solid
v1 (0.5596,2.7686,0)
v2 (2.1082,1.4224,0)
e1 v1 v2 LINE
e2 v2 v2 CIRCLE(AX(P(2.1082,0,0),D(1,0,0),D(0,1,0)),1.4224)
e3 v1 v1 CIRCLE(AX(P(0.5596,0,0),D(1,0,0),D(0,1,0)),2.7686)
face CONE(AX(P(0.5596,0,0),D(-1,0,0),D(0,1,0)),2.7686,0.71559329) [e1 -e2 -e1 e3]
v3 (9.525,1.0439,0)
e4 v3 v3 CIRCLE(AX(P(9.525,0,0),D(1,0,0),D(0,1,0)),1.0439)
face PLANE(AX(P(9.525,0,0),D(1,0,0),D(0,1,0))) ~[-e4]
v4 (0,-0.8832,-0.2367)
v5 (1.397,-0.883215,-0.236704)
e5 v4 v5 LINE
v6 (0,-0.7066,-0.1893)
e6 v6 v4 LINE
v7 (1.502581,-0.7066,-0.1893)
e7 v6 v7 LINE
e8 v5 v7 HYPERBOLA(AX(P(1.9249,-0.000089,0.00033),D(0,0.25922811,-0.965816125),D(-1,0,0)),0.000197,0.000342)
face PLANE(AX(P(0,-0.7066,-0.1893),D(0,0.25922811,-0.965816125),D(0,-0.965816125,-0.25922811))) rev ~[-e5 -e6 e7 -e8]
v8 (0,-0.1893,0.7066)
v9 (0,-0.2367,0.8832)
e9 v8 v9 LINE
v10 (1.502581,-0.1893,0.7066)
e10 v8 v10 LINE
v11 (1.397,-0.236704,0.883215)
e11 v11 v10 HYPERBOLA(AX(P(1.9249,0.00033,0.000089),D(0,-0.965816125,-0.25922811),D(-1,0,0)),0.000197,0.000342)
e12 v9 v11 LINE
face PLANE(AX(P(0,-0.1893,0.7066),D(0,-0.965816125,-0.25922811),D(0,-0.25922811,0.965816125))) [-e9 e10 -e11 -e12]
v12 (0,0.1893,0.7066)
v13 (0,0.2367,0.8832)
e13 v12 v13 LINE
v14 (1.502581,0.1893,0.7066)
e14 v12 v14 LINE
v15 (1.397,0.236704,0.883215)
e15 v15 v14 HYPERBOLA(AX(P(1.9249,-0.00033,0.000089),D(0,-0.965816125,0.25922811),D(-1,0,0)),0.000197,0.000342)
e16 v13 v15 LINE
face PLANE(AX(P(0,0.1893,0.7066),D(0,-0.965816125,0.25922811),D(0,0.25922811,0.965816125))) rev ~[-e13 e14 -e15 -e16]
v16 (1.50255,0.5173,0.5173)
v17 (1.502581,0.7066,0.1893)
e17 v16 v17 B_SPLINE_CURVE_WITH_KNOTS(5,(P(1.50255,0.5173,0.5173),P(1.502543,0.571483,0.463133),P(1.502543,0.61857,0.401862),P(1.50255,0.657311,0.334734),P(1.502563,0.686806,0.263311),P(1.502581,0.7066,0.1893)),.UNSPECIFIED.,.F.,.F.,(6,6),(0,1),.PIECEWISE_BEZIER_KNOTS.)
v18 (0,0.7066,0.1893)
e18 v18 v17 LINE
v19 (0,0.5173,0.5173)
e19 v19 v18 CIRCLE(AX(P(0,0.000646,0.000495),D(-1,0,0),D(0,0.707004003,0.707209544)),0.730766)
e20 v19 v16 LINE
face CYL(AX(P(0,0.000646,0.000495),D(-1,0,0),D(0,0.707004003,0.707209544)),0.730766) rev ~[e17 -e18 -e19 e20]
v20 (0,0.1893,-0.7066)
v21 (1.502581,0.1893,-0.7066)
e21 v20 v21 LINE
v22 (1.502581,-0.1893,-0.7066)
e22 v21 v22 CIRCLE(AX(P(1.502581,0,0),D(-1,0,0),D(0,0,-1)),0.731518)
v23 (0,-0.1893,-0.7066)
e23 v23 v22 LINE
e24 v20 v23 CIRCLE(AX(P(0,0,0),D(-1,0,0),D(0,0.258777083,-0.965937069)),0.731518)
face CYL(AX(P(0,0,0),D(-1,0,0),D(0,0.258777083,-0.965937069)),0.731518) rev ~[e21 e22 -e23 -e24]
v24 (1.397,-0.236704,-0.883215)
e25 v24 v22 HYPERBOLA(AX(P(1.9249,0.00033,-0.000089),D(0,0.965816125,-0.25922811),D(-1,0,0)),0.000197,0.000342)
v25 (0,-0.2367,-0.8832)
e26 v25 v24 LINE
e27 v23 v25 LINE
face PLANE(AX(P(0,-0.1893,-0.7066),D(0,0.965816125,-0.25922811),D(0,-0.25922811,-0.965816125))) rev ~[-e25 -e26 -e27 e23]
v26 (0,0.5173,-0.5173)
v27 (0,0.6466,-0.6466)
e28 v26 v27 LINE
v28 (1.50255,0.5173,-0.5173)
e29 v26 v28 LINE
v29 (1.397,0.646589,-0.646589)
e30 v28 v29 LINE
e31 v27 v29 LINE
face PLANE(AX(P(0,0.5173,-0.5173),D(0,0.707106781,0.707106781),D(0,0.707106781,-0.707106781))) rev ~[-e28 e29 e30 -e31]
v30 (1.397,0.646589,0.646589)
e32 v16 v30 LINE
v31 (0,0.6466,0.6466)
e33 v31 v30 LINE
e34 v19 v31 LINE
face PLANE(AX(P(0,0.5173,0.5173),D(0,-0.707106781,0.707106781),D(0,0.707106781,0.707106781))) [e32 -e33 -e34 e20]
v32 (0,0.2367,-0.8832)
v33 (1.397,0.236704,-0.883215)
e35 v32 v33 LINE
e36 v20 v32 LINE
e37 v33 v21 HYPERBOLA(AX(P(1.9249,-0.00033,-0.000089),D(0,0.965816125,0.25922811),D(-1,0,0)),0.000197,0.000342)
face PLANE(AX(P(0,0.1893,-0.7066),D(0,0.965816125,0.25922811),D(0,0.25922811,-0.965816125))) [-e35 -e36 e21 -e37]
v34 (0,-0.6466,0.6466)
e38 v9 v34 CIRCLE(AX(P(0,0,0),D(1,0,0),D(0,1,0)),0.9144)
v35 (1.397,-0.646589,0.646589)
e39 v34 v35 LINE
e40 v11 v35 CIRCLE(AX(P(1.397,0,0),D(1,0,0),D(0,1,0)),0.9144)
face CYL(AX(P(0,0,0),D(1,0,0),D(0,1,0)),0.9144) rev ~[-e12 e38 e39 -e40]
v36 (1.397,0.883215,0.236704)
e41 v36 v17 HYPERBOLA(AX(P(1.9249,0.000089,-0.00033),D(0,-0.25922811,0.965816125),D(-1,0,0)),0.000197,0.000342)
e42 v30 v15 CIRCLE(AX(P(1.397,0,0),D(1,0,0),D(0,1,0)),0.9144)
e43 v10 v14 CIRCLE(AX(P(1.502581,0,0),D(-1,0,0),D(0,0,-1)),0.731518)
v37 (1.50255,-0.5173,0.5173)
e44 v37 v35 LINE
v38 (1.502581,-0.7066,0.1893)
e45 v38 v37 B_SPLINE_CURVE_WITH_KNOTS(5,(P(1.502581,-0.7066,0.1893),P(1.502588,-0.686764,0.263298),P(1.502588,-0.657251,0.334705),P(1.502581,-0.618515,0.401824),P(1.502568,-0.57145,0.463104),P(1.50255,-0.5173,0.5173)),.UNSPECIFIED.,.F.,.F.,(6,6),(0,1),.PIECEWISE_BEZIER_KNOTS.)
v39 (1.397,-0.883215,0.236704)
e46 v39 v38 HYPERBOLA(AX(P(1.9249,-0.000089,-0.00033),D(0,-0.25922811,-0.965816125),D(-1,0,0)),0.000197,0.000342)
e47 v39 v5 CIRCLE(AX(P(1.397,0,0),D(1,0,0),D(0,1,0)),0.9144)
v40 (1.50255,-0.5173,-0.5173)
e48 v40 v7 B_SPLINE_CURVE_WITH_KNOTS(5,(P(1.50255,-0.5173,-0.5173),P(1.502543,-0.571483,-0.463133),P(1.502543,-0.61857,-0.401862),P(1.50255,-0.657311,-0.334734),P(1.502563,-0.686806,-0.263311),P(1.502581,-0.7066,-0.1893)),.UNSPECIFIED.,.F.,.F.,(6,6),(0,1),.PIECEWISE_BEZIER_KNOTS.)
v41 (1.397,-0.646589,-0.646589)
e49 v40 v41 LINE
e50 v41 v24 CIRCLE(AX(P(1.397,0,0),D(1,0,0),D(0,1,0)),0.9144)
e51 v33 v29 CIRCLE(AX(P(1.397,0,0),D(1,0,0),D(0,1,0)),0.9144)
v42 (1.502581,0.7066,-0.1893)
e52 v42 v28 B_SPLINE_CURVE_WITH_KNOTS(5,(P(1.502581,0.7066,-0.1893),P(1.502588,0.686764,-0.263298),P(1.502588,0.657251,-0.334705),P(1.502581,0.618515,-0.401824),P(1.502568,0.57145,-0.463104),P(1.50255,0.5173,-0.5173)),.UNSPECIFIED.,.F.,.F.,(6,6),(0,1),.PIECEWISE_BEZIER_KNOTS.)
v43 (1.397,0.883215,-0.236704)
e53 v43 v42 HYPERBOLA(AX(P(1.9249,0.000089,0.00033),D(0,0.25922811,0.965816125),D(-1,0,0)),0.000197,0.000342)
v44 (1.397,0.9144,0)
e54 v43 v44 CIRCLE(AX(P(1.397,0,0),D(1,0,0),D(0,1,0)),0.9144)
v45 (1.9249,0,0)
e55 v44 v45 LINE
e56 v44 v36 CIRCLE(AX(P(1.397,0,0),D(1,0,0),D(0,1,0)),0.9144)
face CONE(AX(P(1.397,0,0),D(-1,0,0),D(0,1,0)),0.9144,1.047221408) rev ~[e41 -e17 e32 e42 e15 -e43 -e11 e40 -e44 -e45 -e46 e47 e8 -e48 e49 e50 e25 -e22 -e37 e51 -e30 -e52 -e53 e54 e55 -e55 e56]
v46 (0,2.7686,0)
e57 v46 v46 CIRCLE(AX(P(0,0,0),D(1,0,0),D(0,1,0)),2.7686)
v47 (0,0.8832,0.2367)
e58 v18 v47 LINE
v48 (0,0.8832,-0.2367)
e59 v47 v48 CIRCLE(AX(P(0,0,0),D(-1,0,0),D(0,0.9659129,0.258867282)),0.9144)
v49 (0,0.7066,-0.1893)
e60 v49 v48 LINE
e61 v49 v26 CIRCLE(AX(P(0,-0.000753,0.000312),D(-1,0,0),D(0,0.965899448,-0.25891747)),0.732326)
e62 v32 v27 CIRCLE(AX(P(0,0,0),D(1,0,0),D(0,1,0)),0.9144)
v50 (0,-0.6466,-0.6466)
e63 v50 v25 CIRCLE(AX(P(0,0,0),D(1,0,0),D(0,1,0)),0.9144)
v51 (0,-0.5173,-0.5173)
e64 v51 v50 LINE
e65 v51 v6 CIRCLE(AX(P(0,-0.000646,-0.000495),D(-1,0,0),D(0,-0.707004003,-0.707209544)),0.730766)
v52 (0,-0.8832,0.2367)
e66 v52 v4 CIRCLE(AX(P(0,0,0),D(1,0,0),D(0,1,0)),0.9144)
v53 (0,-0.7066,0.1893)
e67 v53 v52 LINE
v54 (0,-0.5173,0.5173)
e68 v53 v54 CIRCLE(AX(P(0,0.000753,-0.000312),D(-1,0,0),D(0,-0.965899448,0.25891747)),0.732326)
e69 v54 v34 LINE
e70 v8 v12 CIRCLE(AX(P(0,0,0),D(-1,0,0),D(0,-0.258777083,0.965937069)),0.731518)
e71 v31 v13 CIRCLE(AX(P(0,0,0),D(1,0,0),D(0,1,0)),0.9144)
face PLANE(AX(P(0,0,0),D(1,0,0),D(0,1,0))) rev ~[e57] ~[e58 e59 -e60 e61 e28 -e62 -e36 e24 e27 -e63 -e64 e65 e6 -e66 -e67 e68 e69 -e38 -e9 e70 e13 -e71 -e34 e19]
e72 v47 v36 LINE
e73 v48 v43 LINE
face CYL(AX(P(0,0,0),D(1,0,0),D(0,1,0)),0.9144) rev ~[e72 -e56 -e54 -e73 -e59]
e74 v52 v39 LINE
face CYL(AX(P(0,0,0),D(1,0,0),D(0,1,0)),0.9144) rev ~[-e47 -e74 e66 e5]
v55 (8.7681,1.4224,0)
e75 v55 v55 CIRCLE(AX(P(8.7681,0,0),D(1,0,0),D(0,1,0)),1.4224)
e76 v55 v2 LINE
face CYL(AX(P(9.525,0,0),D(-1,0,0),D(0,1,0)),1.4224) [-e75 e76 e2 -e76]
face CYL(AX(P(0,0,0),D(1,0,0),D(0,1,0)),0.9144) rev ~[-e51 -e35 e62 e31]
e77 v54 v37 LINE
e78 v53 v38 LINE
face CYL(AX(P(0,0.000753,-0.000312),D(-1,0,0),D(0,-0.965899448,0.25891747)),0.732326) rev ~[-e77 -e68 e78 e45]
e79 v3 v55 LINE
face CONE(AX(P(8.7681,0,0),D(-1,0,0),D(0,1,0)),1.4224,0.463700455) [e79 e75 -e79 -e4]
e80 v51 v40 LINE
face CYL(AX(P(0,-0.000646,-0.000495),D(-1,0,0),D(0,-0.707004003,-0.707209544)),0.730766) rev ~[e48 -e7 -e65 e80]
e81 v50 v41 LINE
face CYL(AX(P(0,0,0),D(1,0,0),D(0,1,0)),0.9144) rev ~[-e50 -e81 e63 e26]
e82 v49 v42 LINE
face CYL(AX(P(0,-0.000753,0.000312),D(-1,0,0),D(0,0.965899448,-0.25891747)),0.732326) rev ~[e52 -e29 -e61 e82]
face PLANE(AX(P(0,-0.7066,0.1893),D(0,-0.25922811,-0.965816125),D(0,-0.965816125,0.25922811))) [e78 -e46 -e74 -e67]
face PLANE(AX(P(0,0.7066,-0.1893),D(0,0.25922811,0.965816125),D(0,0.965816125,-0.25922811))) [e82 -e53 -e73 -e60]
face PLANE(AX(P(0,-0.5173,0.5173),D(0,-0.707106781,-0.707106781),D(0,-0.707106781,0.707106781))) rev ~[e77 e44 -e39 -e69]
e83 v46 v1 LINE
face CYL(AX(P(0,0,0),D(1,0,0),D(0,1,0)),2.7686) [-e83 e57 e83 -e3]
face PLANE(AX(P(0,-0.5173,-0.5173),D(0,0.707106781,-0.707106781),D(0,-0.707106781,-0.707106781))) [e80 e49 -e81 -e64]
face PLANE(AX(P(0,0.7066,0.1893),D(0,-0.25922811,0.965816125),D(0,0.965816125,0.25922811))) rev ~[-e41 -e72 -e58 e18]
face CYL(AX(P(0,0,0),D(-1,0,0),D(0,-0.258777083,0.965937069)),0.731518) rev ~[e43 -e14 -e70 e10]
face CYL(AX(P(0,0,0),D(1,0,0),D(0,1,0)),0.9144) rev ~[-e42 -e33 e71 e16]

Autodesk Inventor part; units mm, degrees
ref_plane "YZ Plane" through (0, 0, 0) normal (1, 0, 0) x (0, 1, 0)
ref_plane "XZ Plane" through (0, 0, 0) normal (0, 1, 0) x (-1, 0, 0)
sketch "Sketch1" plane through (0, 0, 0) normal (0, 0, 1) x (1, 0, 0)
  line L0 (9.525, 0) -> (9.525, 1.4224)
  line L1 (9.525, 1.4224) -> (2.1082, 1.4224)
  line L2 (0, 2.7686) -> (0, 0.9144)
  line L3 (0, 0.9144) -> (1.397, 0.9144)
  line L4 (1.397, 0.9144) -> (1.9249, 0)
  line L5 (1.9249, 0) -> (9.525, 0)
  line L6 (0, 2.7686) -> (0.5596, 2.7686)
  line L7 (0.5596, 2.7686) -> (2.1082, 1.4224)
  line L8 (-1.905, 0) -> (11.43, 0) projected
  line L9 (0, -0.5537) -> (0, 3.3223) projected
  dimension "d0" = 9.525
  dimension "d1" = 1.397
  dimension "d2" = 2.8448
  dimension "d3" = 2.1082
  dimension "d4" = 41
  dimension "d5" = 1.8288
  dimension "d6" = 60
  dimension "d7" = 5.5372
revolve "Body" add sketch "Sketch1" angle 360 about axis through (1.9249, 0, 0) along (1, 0, 0) contours L5 L4 L3 L2 L6 L7 L1 L0
sketch "Sketch2" plane through (0, 0, 0) normal (-1, 0, 0) x (0, 0, 1)
  circle A0 centre (0, 0) radius 2.7686 projected
  circle A1 centre (0, 0) radius 0.9144 projected
  line L0 (0.7066, 0.1893) -> (0.8832, 0.2367)
  line L1 (0.7066, -0.1893) -> (0.8832, -0.2367)
  arc A2 (0.7066, -0.1893) -> (0.7066, 0.1893) centre (0, 0) ccw
  arc A3 (0.8832, -0.2367) -> (0.8832, 0.2367) centre (0, 0) ccw
  line L2 (0, -3.876) -> (0, 3.876) projected
  line L3 (-3.876, 0) -> (3.876, 0) projected
  line L4 (0.7066, 0.1893) -> (0, 0) construction
  line L5 (0, 0) -> (0.7066, -0.1893) construction
  line L6 (0.1893, 0.7066) -> (0.2367, 0.8832)
  line L7 (0.5173, 0.5173) -> (0.6466, 0.6466)
  arc A4 (0.5173, 0.5173) -> (0.1893, 0.7066) centre (0, 0) ccw
  arc A5 (0.6466, 0.6466) -> (0.2367, 0.8832) centre (0, 0) ccw
  line L8 (-0.5173, 0.5173) -> (-0.6466, 0.6466)
  line L9 (-0.1893, 0.7066) -> (-0.2367, 0.8832)
  arc A6 (-0.1893, 0.7066) -> (-0.5173, 0.5173) centre (0, 0) ccw
  arc A7 (-0.2367, 0.8832) -> (-0.6466, 0.6466) centre (0, 0) ccw
  line L10 (-0.7066, -0.1893) -> (-0.8832, -0.2367)
  line L11 (-0.7066, 0.1893) -> (-0.8832, 0.2367)
  arc A8 (-0.7066, 0.1893) -> (-0.7066, -0.1893) centre (0, 0) ccw
  arc A9 (-0.8832, 0.2367) -> (-0.8832, -0.2367) centre (0, 0) ccw
  line L12 (-0.1893, -0.7066) -> (-0.2367, -0.8832)
  line L13 (-0.5173, -0.5173) -> (-0.6466, -0.6466)
  arc A10 (-0.5173, -0.5173) -> (-0.1893, -0.7066) centre (0, 0) ccw
  arc A11 (-0.6466, -0.6466) -> (-0.2367, -0.8832) centre (0, 0) ccw
  line L14 (0.5173, -0.5173) -> (0.6466, -0.6466)
  line L15 (0.1893, -0.7066) -> (0.2367, -0.8832)
  arc A12 (0.1893, -0.7066) -> (0.5173, -0.5173) centre (0, 0) ccw
  arc A13 (0.2367, -0.8832) -> (0.6466, -0.6466) centre (0, 0) ccw
  dimension "d8" = 1.463
  dimension "d9" = 1.8288
  dimension "d10" = 15
  dimension "d11" = 15
  dimension "d22" = 360
extrude "Slot" add sketch "Sketch2" against normal up to next contours L3 A2 L0 A1 | A1 L1 A2 L3 | L3 A8 L10 A1 | A1 L11 A8 L3 | A1 L7 A4 L6 | L9 A6 L8 A1 | A1 L13 A10 L12 | L15 A12 L14 A1
thread "Thread" size "4-40 UNC" class "2A" standard "ANSI Unified Screw Threads" length 5.8293
chamfer "Chamfer1" distance 0.3785 distance2 0.7569 1 edges at (9.525, -1.4224, 0) measured on face at (9.525, -0.1427, 0.3949)
ref_plane "Work Plane1" through (66.6877, 0, 0) normal (0, 0, -1) x (1, 0, 0)
equation "\"d0\" = NLG"
equation "\"d1\" = INTI"
equation "\"d2\" = GD"
equation "\"d3\" = KOH"
equation "\"d4\" = 0.5 * SEWI"
equation "\"d5\" = SW"
equation "\"d7\" = KOD"
equation "\"d8\" = 0.8 * SW"
equation "\"d9\" = SW"
equation "\"d15\" = GEL"
equation "\"d17\" = -0.5 * SPD + 0.5 * GD"
equation "\"d18\" = GUL"
equation "\"NLG\" = 9.525"
equation "\"SW\" = 1.8288"
equation "\"INTI\" = 1.397"
equation "\"GEL\" = 5.8293"
equation "\"KOH\" = 2.1082"
equation "\"KOD\" = 5.5372"
equation "\"GUL\" = 0.75692"
equation "\"SPD\" = 2.08788"
equation "\"GD\" = NND"
equation "\"SEWI\" = 82deg"
equation "\"TOA\" = 30deg"
equation "\"GD1\" = SPD"
equation "\"EPV\" = 3.74448"
equation "\"THREADDIA\" = 2.8448"
equation "\"BDM\" = NND"
equation "\"NND\" = 2.8448"
equation "\"GAL\" = 1.5875"
equation "\"E0\" = 1.155 * SW"
properties part number "ANSI B18.3 - 4-40 UNC x 0.375, SSFCHCSI" material "Steel, Mild"
